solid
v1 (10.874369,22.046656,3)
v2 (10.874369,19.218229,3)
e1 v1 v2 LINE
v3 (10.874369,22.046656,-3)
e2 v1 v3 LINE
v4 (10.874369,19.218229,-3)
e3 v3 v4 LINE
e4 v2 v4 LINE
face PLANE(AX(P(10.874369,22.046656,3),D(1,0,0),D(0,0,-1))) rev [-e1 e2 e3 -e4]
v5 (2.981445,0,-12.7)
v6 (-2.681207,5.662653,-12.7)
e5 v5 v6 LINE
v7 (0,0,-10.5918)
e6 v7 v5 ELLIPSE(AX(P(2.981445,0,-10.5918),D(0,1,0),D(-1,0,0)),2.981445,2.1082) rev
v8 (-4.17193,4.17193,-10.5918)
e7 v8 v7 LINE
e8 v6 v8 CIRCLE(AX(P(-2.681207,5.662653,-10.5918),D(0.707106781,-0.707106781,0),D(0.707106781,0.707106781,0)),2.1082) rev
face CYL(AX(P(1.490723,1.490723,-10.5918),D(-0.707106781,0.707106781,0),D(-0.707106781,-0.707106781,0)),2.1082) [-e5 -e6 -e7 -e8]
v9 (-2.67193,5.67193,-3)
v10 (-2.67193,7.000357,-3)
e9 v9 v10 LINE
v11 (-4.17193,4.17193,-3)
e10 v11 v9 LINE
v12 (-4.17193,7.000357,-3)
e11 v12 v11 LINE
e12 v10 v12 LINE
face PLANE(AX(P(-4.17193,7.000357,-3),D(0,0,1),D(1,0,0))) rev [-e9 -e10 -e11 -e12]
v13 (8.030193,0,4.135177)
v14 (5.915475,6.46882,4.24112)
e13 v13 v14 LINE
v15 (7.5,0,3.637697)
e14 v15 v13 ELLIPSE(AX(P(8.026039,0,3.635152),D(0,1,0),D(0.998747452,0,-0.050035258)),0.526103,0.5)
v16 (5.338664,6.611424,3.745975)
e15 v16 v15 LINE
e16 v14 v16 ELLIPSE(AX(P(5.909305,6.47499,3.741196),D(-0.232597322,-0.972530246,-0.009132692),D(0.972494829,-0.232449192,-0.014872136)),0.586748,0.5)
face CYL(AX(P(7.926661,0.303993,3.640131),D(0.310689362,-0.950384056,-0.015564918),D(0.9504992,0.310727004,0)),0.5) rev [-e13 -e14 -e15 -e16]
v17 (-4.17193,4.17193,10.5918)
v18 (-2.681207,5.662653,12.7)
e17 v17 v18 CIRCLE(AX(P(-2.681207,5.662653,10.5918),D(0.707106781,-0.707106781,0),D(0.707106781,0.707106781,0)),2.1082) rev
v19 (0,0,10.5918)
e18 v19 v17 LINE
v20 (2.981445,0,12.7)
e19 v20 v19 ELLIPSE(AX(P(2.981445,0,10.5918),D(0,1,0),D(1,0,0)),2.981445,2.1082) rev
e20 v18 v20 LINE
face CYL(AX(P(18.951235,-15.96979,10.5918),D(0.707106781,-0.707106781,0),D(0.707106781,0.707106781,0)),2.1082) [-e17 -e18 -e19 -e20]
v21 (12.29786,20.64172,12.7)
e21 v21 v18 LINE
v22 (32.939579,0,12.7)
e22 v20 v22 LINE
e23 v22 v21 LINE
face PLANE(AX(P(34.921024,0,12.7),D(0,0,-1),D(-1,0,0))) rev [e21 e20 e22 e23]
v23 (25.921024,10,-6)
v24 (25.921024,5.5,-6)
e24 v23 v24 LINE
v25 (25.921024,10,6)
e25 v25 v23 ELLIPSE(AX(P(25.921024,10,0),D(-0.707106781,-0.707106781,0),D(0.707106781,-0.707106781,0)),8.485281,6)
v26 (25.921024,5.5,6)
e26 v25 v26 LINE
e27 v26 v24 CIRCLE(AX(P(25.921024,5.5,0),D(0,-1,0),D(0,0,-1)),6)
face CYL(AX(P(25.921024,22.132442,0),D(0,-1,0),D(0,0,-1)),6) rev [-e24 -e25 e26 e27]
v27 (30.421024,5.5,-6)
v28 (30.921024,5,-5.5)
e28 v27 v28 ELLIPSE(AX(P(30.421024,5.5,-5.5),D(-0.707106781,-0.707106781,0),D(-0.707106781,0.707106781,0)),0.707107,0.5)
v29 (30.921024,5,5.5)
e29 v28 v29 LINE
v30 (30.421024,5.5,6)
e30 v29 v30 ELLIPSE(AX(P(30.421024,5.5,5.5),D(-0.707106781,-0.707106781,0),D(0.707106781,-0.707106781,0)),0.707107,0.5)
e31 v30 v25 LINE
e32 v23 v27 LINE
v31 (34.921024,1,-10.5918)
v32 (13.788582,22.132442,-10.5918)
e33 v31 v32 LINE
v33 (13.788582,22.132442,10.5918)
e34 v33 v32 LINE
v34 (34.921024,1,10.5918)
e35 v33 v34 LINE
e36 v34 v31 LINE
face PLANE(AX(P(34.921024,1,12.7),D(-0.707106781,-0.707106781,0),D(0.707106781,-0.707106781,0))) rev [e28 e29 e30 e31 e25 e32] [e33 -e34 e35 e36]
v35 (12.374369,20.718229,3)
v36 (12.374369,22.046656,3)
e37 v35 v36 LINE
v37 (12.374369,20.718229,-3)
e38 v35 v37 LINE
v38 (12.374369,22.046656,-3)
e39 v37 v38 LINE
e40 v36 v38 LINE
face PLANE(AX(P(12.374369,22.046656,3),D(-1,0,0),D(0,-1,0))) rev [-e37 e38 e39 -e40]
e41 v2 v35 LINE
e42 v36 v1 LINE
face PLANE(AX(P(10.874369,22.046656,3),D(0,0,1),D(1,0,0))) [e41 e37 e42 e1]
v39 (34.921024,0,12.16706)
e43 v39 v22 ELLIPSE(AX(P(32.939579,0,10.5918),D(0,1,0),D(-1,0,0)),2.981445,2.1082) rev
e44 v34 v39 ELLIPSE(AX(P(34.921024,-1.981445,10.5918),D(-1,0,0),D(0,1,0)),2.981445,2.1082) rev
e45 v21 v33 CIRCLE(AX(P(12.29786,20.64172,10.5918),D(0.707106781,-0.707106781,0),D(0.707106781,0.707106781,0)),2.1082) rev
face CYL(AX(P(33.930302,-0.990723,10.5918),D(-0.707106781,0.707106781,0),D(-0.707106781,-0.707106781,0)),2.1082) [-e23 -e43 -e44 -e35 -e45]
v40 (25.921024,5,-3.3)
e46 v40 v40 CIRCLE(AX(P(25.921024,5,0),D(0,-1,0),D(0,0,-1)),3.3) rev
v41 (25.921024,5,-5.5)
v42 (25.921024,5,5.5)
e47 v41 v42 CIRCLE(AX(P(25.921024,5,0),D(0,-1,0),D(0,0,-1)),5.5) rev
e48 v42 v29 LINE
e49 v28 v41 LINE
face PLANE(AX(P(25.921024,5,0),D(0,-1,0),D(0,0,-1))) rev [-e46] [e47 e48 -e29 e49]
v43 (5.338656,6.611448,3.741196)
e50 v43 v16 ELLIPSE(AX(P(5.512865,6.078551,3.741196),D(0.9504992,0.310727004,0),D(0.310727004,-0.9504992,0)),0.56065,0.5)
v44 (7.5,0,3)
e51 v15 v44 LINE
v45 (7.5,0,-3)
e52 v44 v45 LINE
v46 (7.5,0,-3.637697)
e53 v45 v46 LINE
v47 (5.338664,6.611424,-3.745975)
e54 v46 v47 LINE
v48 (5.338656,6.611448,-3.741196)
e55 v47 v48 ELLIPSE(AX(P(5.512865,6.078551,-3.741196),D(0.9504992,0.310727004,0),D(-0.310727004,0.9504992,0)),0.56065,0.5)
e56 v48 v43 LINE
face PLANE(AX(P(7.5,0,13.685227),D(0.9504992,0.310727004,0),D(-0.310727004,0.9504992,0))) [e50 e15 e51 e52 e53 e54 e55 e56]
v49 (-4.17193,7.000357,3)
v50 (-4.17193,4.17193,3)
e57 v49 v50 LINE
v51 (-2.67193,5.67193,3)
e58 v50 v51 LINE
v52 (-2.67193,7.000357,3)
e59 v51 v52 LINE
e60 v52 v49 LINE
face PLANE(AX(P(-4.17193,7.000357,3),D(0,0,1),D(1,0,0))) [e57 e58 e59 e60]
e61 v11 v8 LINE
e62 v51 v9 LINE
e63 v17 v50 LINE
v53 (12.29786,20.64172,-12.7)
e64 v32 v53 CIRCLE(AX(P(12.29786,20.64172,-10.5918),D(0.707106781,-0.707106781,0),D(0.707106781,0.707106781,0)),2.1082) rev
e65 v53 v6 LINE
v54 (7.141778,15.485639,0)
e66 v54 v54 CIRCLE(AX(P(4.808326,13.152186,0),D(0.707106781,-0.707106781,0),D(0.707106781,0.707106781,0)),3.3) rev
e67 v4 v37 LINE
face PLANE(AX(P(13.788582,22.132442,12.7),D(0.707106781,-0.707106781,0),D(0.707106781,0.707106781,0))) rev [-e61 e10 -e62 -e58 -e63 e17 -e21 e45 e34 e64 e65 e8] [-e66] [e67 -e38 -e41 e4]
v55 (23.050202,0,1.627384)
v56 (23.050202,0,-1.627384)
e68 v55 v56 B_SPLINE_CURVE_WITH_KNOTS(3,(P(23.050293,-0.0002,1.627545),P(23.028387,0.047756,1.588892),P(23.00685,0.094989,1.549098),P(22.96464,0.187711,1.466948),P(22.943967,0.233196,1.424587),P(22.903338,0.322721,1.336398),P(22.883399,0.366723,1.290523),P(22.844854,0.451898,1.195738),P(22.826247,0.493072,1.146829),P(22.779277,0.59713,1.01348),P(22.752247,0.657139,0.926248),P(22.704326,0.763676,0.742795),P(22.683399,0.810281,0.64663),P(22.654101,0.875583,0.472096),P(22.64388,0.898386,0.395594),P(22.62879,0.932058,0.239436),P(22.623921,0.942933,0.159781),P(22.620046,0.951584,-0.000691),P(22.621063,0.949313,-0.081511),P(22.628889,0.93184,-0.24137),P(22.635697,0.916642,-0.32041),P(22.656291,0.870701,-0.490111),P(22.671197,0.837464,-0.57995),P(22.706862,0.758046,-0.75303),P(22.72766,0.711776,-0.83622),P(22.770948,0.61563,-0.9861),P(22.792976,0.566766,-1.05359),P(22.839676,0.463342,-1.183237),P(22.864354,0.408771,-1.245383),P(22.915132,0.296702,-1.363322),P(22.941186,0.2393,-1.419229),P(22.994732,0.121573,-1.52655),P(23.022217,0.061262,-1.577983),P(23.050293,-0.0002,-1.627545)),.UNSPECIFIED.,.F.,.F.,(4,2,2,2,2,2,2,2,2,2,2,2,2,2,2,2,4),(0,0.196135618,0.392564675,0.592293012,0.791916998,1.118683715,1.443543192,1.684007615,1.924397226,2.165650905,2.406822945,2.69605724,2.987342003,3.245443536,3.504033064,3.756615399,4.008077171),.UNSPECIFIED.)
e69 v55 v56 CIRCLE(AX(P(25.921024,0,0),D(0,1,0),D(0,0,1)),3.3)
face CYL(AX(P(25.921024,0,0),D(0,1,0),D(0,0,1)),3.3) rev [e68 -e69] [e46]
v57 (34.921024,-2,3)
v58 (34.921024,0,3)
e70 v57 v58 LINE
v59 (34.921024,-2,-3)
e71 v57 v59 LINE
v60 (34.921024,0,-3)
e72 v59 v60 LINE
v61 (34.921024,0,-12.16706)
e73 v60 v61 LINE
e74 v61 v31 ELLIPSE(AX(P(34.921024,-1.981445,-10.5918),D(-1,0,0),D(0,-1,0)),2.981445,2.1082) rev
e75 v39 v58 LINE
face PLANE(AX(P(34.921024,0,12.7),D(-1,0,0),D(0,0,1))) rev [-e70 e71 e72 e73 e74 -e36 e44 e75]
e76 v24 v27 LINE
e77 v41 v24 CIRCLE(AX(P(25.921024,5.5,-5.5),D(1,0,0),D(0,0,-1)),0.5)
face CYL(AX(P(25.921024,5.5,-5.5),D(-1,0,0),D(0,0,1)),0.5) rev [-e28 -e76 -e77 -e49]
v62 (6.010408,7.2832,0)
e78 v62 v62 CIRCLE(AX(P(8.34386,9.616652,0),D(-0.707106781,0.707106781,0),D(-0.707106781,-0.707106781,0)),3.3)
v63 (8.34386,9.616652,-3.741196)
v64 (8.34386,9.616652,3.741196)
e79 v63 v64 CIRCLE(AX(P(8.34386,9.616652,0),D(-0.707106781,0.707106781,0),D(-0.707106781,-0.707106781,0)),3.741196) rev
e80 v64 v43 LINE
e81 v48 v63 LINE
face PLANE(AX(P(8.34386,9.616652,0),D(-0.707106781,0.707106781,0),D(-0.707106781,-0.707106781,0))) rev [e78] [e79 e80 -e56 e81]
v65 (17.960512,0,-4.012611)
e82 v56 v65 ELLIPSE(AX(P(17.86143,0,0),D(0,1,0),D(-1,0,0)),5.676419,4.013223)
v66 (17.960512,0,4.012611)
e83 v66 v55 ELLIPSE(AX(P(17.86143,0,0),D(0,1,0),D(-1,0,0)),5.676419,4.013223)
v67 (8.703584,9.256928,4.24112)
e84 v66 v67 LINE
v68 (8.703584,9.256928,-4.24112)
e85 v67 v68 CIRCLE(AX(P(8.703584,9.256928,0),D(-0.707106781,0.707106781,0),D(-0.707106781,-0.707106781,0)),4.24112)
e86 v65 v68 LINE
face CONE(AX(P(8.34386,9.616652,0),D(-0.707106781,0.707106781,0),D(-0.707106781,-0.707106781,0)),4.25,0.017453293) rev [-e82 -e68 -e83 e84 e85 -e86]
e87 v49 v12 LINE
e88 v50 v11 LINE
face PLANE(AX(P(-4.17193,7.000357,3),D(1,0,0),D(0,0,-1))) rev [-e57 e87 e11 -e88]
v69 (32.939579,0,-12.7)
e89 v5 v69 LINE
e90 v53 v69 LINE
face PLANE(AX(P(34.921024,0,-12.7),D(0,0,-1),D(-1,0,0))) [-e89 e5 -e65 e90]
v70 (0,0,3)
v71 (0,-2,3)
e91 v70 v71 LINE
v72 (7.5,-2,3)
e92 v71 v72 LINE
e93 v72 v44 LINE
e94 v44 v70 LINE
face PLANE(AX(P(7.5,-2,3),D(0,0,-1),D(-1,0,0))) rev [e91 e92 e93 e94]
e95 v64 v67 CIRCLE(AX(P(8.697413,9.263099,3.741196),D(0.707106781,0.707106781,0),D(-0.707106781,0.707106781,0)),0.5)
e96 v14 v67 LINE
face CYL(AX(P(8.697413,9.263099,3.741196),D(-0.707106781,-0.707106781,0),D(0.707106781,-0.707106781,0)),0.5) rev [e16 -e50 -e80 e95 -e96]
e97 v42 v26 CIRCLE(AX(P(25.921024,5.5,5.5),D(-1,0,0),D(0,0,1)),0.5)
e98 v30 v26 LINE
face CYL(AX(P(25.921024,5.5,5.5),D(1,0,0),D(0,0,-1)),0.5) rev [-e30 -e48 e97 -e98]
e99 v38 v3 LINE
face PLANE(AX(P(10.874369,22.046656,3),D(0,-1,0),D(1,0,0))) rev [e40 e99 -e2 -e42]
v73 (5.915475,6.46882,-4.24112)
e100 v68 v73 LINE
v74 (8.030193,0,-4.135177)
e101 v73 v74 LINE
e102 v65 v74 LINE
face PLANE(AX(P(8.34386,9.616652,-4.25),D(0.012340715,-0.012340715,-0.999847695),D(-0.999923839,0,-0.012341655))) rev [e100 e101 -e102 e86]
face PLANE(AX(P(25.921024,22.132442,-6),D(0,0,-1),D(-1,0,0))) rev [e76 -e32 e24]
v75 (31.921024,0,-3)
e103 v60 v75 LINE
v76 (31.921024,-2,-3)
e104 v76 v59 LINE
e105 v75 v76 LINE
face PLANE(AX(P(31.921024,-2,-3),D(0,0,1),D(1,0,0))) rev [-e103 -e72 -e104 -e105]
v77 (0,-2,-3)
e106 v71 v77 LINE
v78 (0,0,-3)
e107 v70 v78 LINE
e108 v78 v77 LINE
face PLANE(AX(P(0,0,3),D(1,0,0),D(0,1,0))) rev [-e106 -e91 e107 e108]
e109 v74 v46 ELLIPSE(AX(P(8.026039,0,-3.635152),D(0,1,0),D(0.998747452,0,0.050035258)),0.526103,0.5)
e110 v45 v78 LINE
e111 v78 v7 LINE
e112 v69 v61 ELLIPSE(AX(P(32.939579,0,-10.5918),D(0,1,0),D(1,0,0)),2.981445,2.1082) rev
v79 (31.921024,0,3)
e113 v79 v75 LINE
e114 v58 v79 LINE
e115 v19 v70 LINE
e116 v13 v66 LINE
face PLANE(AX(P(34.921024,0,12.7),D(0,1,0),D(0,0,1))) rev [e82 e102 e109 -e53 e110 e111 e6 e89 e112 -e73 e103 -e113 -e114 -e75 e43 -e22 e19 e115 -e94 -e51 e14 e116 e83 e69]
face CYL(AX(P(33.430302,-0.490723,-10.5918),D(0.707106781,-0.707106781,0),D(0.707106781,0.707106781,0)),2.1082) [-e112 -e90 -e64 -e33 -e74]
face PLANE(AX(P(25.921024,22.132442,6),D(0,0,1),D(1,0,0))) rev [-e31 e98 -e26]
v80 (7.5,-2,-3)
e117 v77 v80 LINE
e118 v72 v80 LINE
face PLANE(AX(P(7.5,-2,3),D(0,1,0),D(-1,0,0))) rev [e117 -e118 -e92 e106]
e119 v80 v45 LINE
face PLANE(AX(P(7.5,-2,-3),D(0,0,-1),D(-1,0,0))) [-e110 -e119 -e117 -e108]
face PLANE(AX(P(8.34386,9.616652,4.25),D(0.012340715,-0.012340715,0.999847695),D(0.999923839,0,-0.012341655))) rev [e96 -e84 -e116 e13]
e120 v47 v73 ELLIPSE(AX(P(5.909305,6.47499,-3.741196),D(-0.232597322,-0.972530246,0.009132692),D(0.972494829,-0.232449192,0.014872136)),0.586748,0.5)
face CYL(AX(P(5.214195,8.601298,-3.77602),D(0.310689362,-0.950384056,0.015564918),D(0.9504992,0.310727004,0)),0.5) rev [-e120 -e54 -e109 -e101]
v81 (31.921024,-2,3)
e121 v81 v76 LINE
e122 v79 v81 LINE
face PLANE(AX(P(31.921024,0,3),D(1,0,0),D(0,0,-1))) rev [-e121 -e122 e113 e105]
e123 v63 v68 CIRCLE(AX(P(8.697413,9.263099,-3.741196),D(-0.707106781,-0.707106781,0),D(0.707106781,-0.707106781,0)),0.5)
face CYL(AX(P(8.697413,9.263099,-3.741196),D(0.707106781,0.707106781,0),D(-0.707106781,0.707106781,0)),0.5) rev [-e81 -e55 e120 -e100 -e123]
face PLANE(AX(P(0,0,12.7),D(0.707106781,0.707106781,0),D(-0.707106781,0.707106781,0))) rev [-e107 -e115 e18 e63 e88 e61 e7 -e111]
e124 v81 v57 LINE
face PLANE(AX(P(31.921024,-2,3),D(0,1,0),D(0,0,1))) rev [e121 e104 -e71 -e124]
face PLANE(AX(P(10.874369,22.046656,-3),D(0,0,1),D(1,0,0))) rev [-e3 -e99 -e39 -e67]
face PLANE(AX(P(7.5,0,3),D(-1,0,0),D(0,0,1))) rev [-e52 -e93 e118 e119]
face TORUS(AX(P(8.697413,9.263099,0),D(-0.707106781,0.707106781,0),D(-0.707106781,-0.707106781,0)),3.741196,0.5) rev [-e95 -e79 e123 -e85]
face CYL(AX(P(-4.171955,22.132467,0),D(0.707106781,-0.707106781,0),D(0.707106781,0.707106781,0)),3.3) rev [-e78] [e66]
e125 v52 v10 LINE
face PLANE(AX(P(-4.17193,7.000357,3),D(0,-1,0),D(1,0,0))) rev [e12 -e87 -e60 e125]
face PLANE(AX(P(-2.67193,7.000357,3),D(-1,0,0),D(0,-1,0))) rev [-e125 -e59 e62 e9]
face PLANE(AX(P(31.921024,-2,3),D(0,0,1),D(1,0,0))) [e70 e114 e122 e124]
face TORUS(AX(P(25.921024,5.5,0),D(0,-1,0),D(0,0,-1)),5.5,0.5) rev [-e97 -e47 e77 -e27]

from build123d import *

# Parameters (mm, degrees)
BOSS_EXTRUDE1_DEPTH            = 12.7
CUT_EXTRUDE1_START             = 5
SKETCH2_R                      = 3.3
CUT_EXTRUDE1_DEPTH             = 49.250583245
CUT_EXTRUDE2_DEPTH             = 41.918070929
FILLET1_R                      = 2.1082
FILLET2_R                      = 0.5
SKETCH4_W                      = 7.5
SKETCH4_H                      = 2
SKETCH4_W_2                    = 3
BOSS_EXTRUDE4_DEPTH            = 3
CUT_EXTRUDE3_START             = -5
SKETCH5_R                      = 3.3
CUT_EXTRUDE3_DEPTH             = 50.856761932
CUT_EXTRUDE4_DEPTH             = 44.447671501
CUT_EXTRUDE4_DRAFT             = -1
CUT_EXTRUDE5_REACH             = 45.251
CUT_EXTRUDE5_DIRECTION_2_REACH = 45.251
FILLET3_R                      = 0.5
FILLET4_R                      = 0.5


with BuildPart() as part:
    # Sketch1 → Boss-Extrude1 (new, symmetric)
    with BuildSketch(Plane.XY):
        Polygon((0, 0), (-4.171930009, 4.171930009), (13.788582233, 22.132442251), (34.921024484, 1), (34.921024484, 0), align=None)
    extrude(amount=BOSS_EXTRUDE1_DEPTH, both=True)

    # Sketch2 → Cut-Extrude1 (cut, through all)
    with BuildSketch(Plane(origin=(0, 0, 0), x_dir=(1, 0, 0), z_dir=(0, 1, 0)).offset(CUT_EXTRUDE1_START)):
        with Locations(Location((25.921024484, 0, 0), (0, 0, 270))):
            Circle(SKETCH2_R)
    extrude(amount=-CUT_EXTRUDE1_DEPTH, mode=Mode.SUBTRACT)

    # Sketch3 → Cut-Extrude2 (cut, through all)
    with BuildSketch(Plane.XZ.offset(-5)):
        with BuildLine():
            Line((25.921024484, -6), (35.921024484, -6))
            Line((35.921024484, -6), (35.921024484, 6))
            Line((35.921024484, 6), (25.921024484, 6))
            ThreePointArc((25.921024484, 6), (19.921024484, 0), (25.921024484, -6))
        make_face()
    extrude(amount=-CUT_EXTRUDE2_DEPTH, mode=Mode.SUBTRACT)

    # Fillet1
    fillet1_edges = [part.edges().sort_by_distance(p)[0] for p in [
        (-2.085965005, 2.085965005, -12.7),
        (-2.085965005, 2.085965005, 12.7),
        (24.354803359, 11.566221126, -12.7),
        (24.354803359, 11.566221126, 12.7),
    ]]
    fillet(fillet1_edges, radius=FILLET1_R)

    # Fillet2
    fillet2_edges = [part.edges().sort_by_distance(p)[0] for p in [
        (28.421024484, 5, -6),
        (28.421024484, 5, 6),
        (19.921024484, 5, 0),
    ]]
    fillet(fillet2_edges, radius=FILLET2_R)

    # Sketch4 → Boss-Extrude4 (add, symmetric)
    with BuildSketch(Plane.XY):
        with Locations((3.75, -1)):
            Rectangle(SKETCH4_W, SKETCH4_H)
        with Locations((33.421024484, -1)):
            Rectangle(SKETCH4_W_2, SKETCH4_H)
        Polygon((-4.171930009, 7.000357134), (-2.671930009, 7.000357134), (-2.671930009, 5.671930009), (-4.171930009, 4.171930009), align=None)
        Polygon((10.874368671, 22.046655814), (12.374368671, 22.046655814), (12.374368671, 20.718228689), (10.874368671, 19.218228689), align=None)
    extrude(amount=BOSS_EXTRUDE4_DEPTH, both=True)

    # Sketch5 → Cut-Extrude3 (cut, through all)
    with BuildSketch(Plane(origin=(-4.171930009, 4.171930009, 0), x_dir=(0, 0, 1), z_dir=(-0.7071067811865477, 0.7071067811865475, 0)).offset(CUT_EXTRUDE3_START)):
        with Locations(Location((0, 12.7, 0), (0, 0, 90))):
            Circle(SKETCH5_R)
    extrude(amount=CUT_EXTRUDE3_DEPTH, mode=Mode.SUBTRACT)


with BuildPart() as cut_extrude4_tool:
    # Sketch6 → Cut-Extrude4 (with draft: the straight prism first)
    with BuildSketch(Plane(origin=(-0.636396103, 0.636396103, 0), x_dir=(0, 0, 1), z_dir=(-0.7071067811865476, 0.7071067811865476, 0))):
        with BuildLine():
            Line((-4.25, 12.7), (-4.25, 8.45))
            Line((-4.25, 8.45), (4.25, 8.45))
            Line((4.25, 8.45), (4.25, 12.7))
            ThreePointArc((4.25, 12.7), (0, 16.95), (-4.25, 12.7))
        make_face()
    extrude(amount=-CUT_EXTRUDE4_DEPTH)
    # Cut-Extrude4: the draft: its side faces are tilted about the plane it starts from
    cut_extrude4_sides = [cut_extrude4_tool.faces().sort_by_distance(p)[0] for p in [
        (22.555883071, -7.600574649, -4.25),
        (21.053281161, -9.103176559, 0),
        (22.555883071, -7.600574649, 4.25),
        (27.063688801, -3.092768919, 0),
    ]]
    draft(cut_extrude4_sides, Plane(origin=(-0.636396103, 0.636396103, 0), x_dir=(0, 0, 1), z_dir=(-0.7071067811865476, 0.7071067811865476, 0)), CUT_EXTRUDE4_DRAFT)


with BuildPart() as part_1:
    add(part.part)

    # Cut-Extrude4: cut by cut_extrude4_tool
    add(cut_extrude4_tool.part, mode=Mode.SUBTRACT)

    # Cut-Extrude5: up to this plane
    cut_extrude5_end = Plane(origin=(8.343860018, 9.616652224, 4.25), z_dir=(0.012340714939826952, -0.012340714939826952, 0.9998476951563913))
    # Sketch7 → Cut-Extrude5 (cut, up to the surface)
    with BuildSketch(Plane.XY, mode=Mode.PRIVATE) as cut_extrude5_sk1:
        Polygon((12.185011438, 0), (7.5, 0), (5.338656198, 6.611448404), align=None)
    cut_extrude5_tool1 = split(extrude(cut_extrude5_sk1.sketch, amount=CUT_EXTRUDE5_REACH, mode=Mode.PRIVATE), bisect_by=cut_extrude5_end, keep=Keep.BOTH, mode=Mode.PRIVATE)
    add(cut_extrude5_tool1.solids().sort_by_distance((8.341223, 2.203816, 0))[0], mode=Mode.SUBTRACT)

    # Cut-Extrude5 direction 2: up to this plane
    cut_extrude5_direction_2_end = Plane(origin=(8.343860018, 9.616652224, -4.25), z_dir=(0.012340714939826952, -0.012340714939826952, -0.9998476951563913))
    # Sketch7 → Cut-Extrude5 direction 2 (cut, up to the surface)
    with BuildSketch(Plane.XY, mode=Mode.PRIVATE) as cut_extrude5_direction_2_sk1:
        Polygon((12.185011438, 0), (7.5, 0), (5.338656198, 6.611448404), align=None)
    cut_extrude5_direction_2_tool1 = split(extrude(cut_extrude5_direction_2_sk1.sketch, amount=-CUT_EXTRUDE5_DIRECTION_2_REACH, mode=Mode.PRIVATE), bisect_by=cut_extrude5_direction_2_end, keep=Keep.BOTH, mode=Mode.PRIVATE)
    add(cut_extrude5_direction_2_tool1.solids().sort_by_distance((8.341223, 2.203816, 0))[0], mode=Mode.SUBTRACT)

    # Fillet3
    fillet3_edges = [part_1.edges().sort_by_distance(p)[0] for p in [
        (11.349063838, 12.621856044, 0),
        (6.841258108, 8.114050314, -4.25),
        (6.841258108, 8.114050314, 4.25),
    ]]
    fillet(fillet3_edges, radius=FILLET3_R)

    # Fillet4
    # the kernel refuses this fillet: 0.5 mm, written as the material it adds along each edge
    with BuildSketch(Plane(origin=(7.891440115, -1.197396785, 4.122110611), x_dir=(0.9504313899021286, 0.31083412501895896, -0.007894289860799094), z_dir=(-0.3106893622953352, 0.9503840557787532, 0.015564918183075198))) as fillet4_piece_1_section:
        with BuildLine():
            CenterArc((FILLET4_R * 1.0079266613, FILLET4_R), FILLET4_R, 179.547631009, 90.452368991)
            Line((FILLET4_R * 0.00795782923952, FILLET4_R * 1.0078952463), (0, 0))
            Line((0, 0), (FILLET4_R * 1.0079266613, 0))
        make_face()
    fillet4_piece_1 = extrude(amount=8.905919631, mode=Mode.PRIVATE)
    fillet4_piece_1 = split(fillet4_piece_1, bisect_by=Plane(origin=(6.661619064, 0, 4.078163778), z_dir=(0, 1, 0)), keep=Keep.TOP, mode=Mode.PRIVATE)
    add(fillet4_piece_1)
    with BuildSketch(Plane(origin=(7.891440115, -1.197396785, -4.122110611), x_dir=(-0.004836440394139795, 0.014794442279442568, 0.9998788593234452), z_dir=(-0.3106893622953352, 0.9503840557787532, -0.015564918183075198))) as fillet4_piece_2_section:
        with BuildLine():
            CenterArc((FILLET4_R * 1.0079266613, FILLET4_R), FILLET4_R, 179.547631009, 90.452368991)
            Line((FILLET4_R * 0.00795782923952, FILLET4_R * 1.0078952463), (0, 0))
            Line((0, 0), (FILLET4_R * 1.0079266613, 0))
        make_face()
    fillet4_piece_2 = extrude(amount=8.905919631, mode=Mode.PRIVATE)
    fillet4_piece_2 = split(fillet4_piece_2, bisect_by=Plane(origin=(6.661619064, 0, -4.078163778), z_dir=(0, 1, 0)), keep=Keep.TOP, mode=Mode.PRIVATE)
    add(fillet4_piece_2)


solid = part_1.part
